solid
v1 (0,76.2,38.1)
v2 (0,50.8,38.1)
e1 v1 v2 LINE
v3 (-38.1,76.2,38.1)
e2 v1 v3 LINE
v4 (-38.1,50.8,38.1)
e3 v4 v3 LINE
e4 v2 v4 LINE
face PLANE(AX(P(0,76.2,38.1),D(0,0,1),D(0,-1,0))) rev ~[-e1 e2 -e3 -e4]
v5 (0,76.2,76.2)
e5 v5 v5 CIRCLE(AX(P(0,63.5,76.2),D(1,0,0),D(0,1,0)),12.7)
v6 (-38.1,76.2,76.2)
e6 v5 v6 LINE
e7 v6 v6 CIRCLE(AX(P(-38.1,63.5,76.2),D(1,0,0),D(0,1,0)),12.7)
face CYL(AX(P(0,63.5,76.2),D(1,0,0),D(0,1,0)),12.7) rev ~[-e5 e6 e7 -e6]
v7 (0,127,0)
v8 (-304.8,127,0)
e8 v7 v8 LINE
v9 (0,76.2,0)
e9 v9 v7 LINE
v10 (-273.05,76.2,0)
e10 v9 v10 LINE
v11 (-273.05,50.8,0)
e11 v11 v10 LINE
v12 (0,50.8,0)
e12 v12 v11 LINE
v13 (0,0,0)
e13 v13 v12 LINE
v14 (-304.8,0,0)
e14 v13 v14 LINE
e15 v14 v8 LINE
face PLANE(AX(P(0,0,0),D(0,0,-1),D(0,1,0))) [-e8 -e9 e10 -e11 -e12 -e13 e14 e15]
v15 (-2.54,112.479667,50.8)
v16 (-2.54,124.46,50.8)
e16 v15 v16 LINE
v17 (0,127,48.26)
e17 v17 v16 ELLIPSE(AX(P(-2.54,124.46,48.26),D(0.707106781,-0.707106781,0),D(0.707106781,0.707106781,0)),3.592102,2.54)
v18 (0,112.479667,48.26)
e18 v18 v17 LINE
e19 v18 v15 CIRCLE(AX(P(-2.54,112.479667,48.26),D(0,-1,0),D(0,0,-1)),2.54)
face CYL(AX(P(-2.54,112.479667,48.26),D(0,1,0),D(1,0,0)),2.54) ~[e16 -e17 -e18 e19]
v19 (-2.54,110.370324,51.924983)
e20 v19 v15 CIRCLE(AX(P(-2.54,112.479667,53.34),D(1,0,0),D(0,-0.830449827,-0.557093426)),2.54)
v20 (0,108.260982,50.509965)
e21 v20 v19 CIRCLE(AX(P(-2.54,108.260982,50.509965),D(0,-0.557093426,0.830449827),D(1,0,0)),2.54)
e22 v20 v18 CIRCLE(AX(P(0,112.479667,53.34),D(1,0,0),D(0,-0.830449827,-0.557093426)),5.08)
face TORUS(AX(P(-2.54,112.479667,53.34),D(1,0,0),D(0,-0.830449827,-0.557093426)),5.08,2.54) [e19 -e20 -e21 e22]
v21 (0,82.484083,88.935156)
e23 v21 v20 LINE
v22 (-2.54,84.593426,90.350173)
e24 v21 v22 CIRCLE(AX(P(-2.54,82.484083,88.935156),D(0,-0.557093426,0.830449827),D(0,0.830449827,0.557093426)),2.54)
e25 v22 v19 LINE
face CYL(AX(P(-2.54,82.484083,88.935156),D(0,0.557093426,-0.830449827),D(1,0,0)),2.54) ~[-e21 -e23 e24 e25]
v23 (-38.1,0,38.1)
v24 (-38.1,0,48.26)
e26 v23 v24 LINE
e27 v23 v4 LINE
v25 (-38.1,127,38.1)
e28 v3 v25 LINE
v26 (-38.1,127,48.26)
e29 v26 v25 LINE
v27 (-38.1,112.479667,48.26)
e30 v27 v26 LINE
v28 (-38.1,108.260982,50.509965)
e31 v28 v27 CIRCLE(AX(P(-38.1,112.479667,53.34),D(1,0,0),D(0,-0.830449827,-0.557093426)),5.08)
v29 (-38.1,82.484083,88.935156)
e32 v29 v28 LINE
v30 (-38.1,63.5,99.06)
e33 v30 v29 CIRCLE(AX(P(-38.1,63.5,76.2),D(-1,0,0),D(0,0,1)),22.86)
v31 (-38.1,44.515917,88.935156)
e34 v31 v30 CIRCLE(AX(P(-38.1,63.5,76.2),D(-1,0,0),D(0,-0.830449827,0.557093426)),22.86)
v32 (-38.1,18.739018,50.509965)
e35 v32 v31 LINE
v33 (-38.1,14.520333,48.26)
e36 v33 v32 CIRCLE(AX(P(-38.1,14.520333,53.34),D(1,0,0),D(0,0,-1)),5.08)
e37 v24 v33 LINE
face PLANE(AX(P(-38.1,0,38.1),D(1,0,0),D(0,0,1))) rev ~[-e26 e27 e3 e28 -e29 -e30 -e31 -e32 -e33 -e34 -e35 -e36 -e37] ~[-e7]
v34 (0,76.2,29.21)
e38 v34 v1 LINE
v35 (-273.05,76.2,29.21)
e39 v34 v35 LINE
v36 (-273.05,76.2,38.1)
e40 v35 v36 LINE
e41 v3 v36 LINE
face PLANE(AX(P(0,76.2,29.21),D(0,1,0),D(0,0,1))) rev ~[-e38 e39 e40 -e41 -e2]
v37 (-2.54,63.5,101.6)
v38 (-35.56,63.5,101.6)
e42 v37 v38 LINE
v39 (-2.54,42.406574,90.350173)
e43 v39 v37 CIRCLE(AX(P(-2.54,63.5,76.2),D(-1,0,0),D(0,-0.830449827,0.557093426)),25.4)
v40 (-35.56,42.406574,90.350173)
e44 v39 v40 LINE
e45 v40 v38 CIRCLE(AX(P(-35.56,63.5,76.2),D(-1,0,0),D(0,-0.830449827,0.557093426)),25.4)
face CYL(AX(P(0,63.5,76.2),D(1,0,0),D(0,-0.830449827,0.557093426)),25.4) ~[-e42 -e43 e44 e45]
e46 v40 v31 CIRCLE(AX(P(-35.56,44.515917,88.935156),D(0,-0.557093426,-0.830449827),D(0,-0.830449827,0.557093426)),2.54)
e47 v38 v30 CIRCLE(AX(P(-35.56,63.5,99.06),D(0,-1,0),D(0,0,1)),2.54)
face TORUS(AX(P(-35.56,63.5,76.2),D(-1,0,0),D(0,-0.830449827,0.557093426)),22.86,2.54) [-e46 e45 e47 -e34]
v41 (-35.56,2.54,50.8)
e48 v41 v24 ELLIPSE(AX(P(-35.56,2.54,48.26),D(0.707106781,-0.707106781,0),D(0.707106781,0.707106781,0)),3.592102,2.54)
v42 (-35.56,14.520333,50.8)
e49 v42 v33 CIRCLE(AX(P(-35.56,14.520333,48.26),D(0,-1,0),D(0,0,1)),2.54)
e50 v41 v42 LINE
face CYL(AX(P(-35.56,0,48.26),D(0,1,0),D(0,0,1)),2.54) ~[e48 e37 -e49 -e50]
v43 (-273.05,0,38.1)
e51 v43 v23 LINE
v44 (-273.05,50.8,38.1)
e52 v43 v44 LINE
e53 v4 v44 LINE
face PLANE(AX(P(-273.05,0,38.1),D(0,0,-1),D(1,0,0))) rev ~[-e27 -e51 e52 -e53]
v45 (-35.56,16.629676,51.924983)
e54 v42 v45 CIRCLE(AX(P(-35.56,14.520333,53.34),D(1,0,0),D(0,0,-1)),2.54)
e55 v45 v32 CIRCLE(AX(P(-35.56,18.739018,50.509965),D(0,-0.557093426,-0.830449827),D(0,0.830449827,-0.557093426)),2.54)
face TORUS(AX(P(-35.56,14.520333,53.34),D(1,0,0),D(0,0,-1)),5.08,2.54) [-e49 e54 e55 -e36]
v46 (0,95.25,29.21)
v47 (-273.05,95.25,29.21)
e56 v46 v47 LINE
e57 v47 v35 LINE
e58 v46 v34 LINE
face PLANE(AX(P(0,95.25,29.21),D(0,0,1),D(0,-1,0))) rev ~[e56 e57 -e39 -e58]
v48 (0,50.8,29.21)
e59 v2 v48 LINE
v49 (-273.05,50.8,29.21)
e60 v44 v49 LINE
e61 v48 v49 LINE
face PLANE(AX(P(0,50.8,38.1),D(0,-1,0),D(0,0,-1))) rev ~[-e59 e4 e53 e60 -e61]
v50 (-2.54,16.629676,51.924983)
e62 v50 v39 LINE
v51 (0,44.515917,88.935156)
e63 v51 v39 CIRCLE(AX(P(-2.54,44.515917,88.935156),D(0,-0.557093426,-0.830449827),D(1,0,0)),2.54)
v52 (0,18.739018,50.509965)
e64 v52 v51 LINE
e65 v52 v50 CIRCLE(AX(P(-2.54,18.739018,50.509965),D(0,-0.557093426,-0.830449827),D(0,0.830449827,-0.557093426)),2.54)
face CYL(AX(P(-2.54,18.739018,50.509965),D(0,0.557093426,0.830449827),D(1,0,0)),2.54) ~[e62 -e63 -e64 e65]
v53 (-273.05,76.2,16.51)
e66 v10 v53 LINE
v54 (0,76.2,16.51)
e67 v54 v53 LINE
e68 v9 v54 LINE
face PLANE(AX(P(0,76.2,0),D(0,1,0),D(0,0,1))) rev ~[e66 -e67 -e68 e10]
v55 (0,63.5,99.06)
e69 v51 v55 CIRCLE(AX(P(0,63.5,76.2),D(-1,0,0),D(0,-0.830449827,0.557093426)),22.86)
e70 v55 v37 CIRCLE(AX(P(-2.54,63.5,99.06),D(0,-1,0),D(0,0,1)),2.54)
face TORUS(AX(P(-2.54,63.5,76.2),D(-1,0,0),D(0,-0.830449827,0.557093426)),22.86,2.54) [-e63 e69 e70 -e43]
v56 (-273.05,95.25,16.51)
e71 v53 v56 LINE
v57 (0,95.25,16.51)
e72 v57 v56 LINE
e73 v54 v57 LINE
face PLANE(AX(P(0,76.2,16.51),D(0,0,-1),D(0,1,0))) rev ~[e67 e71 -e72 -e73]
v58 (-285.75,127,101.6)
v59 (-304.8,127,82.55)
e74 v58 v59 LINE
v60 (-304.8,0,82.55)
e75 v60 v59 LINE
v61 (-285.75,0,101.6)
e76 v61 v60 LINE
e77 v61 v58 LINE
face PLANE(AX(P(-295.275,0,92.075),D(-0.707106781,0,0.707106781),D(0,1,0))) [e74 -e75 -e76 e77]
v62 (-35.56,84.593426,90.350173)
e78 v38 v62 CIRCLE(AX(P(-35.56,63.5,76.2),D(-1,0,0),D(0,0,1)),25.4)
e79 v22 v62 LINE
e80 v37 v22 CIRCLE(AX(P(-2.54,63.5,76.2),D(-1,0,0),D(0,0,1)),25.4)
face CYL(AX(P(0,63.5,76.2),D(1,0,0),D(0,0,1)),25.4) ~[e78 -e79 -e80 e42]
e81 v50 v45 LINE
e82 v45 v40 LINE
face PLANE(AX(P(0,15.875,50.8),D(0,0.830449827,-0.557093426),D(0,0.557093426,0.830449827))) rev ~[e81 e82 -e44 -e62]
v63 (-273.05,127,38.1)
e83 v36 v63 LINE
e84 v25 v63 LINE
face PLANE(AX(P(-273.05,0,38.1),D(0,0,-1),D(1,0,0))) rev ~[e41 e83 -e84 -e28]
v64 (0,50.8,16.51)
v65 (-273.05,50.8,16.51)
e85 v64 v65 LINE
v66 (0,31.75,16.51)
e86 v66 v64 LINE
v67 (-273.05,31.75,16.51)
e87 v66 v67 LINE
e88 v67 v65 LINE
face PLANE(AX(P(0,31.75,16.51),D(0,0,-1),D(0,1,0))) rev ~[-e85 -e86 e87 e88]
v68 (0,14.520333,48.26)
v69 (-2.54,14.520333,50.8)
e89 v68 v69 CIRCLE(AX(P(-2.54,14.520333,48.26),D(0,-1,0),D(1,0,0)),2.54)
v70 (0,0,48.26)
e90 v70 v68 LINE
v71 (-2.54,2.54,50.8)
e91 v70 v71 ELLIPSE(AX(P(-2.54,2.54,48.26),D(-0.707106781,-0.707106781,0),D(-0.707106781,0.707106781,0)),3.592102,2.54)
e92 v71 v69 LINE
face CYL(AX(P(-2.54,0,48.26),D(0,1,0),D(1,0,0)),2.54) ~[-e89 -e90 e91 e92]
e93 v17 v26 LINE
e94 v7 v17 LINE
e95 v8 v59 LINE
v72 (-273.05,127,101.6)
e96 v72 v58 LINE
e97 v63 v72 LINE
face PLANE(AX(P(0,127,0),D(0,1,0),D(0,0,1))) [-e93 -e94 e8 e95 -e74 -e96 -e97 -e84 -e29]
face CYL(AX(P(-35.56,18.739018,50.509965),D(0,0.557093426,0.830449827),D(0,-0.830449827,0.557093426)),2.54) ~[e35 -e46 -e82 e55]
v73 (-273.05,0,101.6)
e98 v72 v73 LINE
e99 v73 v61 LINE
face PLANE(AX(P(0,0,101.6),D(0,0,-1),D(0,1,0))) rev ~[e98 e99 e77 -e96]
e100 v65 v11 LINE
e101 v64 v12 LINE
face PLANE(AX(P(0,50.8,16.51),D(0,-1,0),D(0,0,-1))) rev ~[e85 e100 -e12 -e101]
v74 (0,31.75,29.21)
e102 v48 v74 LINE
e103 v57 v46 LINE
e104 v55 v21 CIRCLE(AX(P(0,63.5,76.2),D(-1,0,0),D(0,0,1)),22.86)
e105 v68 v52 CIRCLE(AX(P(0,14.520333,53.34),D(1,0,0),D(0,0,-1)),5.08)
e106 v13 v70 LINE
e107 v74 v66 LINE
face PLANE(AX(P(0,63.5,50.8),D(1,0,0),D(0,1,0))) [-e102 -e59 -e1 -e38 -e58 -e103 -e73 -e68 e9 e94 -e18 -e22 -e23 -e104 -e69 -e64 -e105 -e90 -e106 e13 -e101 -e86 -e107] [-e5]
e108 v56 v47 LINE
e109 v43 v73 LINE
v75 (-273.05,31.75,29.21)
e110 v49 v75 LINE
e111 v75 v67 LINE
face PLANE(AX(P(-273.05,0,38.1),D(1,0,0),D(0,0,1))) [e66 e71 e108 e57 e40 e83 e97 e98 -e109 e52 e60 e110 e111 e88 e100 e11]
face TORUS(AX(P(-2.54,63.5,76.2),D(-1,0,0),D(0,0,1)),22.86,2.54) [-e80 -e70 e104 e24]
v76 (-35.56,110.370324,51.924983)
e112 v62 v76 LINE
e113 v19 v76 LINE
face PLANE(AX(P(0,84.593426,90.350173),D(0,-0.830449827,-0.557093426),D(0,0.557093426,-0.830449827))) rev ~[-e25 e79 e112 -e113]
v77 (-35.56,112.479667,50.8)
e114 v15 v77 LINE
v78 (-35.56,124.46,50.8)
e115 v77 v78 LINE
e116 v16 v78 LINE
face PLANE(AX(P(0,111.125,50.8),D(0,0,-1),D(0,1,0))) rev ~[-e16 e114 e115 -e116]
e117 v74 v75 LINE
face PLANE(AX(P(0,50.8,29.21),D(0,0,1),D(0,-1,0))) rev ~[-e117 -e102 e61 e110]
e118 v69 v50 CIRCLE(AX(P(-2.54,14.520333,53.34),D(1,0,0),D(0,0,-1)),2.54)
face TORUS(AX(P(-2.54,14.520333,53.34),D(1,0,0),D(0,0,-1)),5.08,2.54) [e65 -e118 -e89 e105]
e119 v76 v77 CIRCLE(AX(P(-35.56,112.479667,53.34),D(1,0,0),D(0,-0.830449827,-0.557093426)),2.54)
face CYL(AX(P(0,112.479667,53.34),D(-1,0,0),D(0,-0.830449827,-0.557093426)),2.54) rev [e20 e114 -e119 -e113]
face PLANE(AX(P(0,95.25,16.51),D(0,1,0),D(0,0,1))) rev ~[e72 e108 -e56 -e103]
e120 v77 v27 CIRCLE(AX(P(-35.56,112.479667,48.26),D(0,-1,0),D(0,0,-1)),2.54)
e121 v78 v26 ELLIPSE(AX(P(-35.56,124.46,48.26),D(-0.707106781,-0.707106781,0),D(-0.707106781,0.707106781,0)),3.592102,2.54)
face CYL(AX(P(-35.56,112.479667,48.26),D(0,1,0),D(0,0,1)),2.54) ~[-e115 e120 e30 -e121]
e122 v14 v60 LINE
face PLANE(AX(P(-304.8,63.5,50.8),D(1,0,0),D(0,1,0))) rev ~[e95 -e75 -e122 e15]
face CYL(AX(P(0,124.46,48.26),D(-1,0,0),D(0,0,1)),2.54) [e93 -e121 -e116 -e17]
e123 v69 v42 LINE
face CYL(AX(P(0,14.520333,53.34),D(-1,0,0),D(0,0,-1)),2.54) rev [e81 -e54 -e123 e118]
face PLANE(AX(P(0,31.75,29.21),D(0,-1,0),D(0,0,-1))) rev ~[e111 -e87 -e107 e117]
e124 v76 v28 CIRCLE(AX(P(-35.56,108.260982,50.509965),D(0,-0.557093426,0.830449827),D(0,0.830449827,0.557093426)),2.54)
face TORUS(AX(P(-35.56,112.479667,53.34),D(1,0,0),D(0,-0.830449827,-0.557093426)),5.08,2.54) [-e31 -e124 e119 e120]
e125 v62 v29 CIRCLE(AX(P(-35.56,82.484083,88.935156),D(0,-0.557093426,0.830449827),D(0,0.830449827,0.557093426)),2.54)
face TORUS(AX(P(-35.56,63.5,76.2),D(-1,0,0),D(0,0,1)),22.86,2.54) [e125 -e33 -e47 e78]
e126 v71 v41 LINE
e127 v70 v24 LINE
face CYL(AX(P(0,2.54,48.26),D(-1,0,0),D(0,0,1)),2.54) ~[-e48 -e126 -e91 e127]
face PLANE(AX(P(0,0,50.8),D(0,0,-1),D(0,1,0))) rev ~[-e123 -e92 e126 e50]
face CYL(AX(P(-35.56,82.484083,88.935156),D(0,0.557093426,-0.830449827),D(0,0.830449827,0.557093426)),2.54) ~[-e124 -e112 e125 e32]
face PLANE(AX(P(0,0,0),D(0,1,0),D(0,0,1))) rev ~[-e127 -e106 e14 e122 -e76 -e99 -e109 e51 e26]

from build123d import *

# Parameters (mm, degrees)
F0_W     = 127
F0_H     = 101.6
F1_DEPTH = 304.8
F2_W     = 234.95
F2_H     = 63.5
F3_DEPTH = 127.001
F4_R     = 12.7
F5_DEPTH = 273.05
F6_SIZE  = 19.05
F7_F1_R  = 2.54
F7_F2_R  = 2.54


with BuildPart() as f1:
    # F0 (on Right) → F1 (new body)
    with BuildSketch(Plane.YZ):
        with Locations((63.5, 50.8)):
            Rectangle(F0_W, F0_H)
    extrude(amount=-F1_DEPTH)

    # F2 (on face) → F3 (cut, through all)
    with BuildSketch(Plane.XZ):
        with Locations((-155.575, 69.85)):
            Rectangle(F2_W, F2_H)
    extrude(amount=-F3_DEPTH, mode=Mode.SUBTRACT)

    # F4 (on face) → F5 (cut, through all)
    with BuildSketch(Plane.YZ):
        with Locations((63.5, 76.2)):
            Circle(F4_R)
        Polygon((50.8, 16.51), (50.8, 0), (76.2, 0), (76.2, 16.51), (95.25, 16.51), (95.25, 29.21), (76.2, 29.21), (76.2, 38.1), (50.8, 38.1), (50.8, 29.21), (31.75, 29.21), (31.75, 16.51), align=None)
        with BuildLine():
            Line((0, 101.6), (0, 50.8))
            Line((0, 50.8), (15.875, 50.8))
            Line((15.875, 50.8), (42.4065743945, 90.3501730104))
            ThreePointArc((42.4065743945, 90.3501730104), (51.5470588235, 98.6117647059), (63.5, 101.6))
            Line((63.5, 101.6), (0, 101.6))
        make_face()
        with BuildLine():
            Line((127, 101.6), (63.5, 101.6))
            ThreePointArc((63.5, 101.6), (75.4529411765, 98.6117647059), (84.5934256055, 90.3501730104))
            Line((84.5934256055, 90.3501730104), (111.125, 50.8))
            Line((111.125, 50.8), (127, 50.8))
            Line((127, 50.8), (127, 101.6))
        make_face()
    extrude(amount=-F5_DEPTH, mode=Mode.SUBTRACT)

    # F6
    f6_edges = [f1.edges().sort_by_distance(p)[0] for p in [
        (-304.8, 63.5, 101.6),
    ]]
    chamfer(f6_edges, length=F6_SIZE)

    # F7: fillet of radius 2.54 on 6 edges, made by hand

    # F7_f1
    f7_f1_edges = [f1.edges().sort_by_distance(p)[0] for p in [
        (-19.05, 15.875, 50.8),
        (-19.05, 111.125, 50.8),
    ]]
    fillet(f7_f1_edges, radius=F7_F1_R)

    # F7_f2
    f7_f2_edges = [f1.edges().sort_by_distance(p)[0] for p in [
        (0, 29.5181251442, 71.1375778547),
        (-38.1, 29.5181251442, 71.1375778547),
        (-19.05, 127, 50.8),
        (-19.05, 0, 50.8),
        (-38.1, 63.5, 101.6),
        (-38.1, 97.4818748558, 71.1375778547),
        (0, 63.5, 101.6),
        (0, 97.4818748558, 71.1375778547),
        (0, 111.284372549, 51.0988235294),
        (-38.1, 111.284372549, 51.0988235294),
        (-38.1, 15.715627451, 51.0988235294),
        (0, 15.715627451, 51.0988235294),
    ]]
    fillet(f7_f2_edges, radius=F7_F2_R)


solid = f1.part
